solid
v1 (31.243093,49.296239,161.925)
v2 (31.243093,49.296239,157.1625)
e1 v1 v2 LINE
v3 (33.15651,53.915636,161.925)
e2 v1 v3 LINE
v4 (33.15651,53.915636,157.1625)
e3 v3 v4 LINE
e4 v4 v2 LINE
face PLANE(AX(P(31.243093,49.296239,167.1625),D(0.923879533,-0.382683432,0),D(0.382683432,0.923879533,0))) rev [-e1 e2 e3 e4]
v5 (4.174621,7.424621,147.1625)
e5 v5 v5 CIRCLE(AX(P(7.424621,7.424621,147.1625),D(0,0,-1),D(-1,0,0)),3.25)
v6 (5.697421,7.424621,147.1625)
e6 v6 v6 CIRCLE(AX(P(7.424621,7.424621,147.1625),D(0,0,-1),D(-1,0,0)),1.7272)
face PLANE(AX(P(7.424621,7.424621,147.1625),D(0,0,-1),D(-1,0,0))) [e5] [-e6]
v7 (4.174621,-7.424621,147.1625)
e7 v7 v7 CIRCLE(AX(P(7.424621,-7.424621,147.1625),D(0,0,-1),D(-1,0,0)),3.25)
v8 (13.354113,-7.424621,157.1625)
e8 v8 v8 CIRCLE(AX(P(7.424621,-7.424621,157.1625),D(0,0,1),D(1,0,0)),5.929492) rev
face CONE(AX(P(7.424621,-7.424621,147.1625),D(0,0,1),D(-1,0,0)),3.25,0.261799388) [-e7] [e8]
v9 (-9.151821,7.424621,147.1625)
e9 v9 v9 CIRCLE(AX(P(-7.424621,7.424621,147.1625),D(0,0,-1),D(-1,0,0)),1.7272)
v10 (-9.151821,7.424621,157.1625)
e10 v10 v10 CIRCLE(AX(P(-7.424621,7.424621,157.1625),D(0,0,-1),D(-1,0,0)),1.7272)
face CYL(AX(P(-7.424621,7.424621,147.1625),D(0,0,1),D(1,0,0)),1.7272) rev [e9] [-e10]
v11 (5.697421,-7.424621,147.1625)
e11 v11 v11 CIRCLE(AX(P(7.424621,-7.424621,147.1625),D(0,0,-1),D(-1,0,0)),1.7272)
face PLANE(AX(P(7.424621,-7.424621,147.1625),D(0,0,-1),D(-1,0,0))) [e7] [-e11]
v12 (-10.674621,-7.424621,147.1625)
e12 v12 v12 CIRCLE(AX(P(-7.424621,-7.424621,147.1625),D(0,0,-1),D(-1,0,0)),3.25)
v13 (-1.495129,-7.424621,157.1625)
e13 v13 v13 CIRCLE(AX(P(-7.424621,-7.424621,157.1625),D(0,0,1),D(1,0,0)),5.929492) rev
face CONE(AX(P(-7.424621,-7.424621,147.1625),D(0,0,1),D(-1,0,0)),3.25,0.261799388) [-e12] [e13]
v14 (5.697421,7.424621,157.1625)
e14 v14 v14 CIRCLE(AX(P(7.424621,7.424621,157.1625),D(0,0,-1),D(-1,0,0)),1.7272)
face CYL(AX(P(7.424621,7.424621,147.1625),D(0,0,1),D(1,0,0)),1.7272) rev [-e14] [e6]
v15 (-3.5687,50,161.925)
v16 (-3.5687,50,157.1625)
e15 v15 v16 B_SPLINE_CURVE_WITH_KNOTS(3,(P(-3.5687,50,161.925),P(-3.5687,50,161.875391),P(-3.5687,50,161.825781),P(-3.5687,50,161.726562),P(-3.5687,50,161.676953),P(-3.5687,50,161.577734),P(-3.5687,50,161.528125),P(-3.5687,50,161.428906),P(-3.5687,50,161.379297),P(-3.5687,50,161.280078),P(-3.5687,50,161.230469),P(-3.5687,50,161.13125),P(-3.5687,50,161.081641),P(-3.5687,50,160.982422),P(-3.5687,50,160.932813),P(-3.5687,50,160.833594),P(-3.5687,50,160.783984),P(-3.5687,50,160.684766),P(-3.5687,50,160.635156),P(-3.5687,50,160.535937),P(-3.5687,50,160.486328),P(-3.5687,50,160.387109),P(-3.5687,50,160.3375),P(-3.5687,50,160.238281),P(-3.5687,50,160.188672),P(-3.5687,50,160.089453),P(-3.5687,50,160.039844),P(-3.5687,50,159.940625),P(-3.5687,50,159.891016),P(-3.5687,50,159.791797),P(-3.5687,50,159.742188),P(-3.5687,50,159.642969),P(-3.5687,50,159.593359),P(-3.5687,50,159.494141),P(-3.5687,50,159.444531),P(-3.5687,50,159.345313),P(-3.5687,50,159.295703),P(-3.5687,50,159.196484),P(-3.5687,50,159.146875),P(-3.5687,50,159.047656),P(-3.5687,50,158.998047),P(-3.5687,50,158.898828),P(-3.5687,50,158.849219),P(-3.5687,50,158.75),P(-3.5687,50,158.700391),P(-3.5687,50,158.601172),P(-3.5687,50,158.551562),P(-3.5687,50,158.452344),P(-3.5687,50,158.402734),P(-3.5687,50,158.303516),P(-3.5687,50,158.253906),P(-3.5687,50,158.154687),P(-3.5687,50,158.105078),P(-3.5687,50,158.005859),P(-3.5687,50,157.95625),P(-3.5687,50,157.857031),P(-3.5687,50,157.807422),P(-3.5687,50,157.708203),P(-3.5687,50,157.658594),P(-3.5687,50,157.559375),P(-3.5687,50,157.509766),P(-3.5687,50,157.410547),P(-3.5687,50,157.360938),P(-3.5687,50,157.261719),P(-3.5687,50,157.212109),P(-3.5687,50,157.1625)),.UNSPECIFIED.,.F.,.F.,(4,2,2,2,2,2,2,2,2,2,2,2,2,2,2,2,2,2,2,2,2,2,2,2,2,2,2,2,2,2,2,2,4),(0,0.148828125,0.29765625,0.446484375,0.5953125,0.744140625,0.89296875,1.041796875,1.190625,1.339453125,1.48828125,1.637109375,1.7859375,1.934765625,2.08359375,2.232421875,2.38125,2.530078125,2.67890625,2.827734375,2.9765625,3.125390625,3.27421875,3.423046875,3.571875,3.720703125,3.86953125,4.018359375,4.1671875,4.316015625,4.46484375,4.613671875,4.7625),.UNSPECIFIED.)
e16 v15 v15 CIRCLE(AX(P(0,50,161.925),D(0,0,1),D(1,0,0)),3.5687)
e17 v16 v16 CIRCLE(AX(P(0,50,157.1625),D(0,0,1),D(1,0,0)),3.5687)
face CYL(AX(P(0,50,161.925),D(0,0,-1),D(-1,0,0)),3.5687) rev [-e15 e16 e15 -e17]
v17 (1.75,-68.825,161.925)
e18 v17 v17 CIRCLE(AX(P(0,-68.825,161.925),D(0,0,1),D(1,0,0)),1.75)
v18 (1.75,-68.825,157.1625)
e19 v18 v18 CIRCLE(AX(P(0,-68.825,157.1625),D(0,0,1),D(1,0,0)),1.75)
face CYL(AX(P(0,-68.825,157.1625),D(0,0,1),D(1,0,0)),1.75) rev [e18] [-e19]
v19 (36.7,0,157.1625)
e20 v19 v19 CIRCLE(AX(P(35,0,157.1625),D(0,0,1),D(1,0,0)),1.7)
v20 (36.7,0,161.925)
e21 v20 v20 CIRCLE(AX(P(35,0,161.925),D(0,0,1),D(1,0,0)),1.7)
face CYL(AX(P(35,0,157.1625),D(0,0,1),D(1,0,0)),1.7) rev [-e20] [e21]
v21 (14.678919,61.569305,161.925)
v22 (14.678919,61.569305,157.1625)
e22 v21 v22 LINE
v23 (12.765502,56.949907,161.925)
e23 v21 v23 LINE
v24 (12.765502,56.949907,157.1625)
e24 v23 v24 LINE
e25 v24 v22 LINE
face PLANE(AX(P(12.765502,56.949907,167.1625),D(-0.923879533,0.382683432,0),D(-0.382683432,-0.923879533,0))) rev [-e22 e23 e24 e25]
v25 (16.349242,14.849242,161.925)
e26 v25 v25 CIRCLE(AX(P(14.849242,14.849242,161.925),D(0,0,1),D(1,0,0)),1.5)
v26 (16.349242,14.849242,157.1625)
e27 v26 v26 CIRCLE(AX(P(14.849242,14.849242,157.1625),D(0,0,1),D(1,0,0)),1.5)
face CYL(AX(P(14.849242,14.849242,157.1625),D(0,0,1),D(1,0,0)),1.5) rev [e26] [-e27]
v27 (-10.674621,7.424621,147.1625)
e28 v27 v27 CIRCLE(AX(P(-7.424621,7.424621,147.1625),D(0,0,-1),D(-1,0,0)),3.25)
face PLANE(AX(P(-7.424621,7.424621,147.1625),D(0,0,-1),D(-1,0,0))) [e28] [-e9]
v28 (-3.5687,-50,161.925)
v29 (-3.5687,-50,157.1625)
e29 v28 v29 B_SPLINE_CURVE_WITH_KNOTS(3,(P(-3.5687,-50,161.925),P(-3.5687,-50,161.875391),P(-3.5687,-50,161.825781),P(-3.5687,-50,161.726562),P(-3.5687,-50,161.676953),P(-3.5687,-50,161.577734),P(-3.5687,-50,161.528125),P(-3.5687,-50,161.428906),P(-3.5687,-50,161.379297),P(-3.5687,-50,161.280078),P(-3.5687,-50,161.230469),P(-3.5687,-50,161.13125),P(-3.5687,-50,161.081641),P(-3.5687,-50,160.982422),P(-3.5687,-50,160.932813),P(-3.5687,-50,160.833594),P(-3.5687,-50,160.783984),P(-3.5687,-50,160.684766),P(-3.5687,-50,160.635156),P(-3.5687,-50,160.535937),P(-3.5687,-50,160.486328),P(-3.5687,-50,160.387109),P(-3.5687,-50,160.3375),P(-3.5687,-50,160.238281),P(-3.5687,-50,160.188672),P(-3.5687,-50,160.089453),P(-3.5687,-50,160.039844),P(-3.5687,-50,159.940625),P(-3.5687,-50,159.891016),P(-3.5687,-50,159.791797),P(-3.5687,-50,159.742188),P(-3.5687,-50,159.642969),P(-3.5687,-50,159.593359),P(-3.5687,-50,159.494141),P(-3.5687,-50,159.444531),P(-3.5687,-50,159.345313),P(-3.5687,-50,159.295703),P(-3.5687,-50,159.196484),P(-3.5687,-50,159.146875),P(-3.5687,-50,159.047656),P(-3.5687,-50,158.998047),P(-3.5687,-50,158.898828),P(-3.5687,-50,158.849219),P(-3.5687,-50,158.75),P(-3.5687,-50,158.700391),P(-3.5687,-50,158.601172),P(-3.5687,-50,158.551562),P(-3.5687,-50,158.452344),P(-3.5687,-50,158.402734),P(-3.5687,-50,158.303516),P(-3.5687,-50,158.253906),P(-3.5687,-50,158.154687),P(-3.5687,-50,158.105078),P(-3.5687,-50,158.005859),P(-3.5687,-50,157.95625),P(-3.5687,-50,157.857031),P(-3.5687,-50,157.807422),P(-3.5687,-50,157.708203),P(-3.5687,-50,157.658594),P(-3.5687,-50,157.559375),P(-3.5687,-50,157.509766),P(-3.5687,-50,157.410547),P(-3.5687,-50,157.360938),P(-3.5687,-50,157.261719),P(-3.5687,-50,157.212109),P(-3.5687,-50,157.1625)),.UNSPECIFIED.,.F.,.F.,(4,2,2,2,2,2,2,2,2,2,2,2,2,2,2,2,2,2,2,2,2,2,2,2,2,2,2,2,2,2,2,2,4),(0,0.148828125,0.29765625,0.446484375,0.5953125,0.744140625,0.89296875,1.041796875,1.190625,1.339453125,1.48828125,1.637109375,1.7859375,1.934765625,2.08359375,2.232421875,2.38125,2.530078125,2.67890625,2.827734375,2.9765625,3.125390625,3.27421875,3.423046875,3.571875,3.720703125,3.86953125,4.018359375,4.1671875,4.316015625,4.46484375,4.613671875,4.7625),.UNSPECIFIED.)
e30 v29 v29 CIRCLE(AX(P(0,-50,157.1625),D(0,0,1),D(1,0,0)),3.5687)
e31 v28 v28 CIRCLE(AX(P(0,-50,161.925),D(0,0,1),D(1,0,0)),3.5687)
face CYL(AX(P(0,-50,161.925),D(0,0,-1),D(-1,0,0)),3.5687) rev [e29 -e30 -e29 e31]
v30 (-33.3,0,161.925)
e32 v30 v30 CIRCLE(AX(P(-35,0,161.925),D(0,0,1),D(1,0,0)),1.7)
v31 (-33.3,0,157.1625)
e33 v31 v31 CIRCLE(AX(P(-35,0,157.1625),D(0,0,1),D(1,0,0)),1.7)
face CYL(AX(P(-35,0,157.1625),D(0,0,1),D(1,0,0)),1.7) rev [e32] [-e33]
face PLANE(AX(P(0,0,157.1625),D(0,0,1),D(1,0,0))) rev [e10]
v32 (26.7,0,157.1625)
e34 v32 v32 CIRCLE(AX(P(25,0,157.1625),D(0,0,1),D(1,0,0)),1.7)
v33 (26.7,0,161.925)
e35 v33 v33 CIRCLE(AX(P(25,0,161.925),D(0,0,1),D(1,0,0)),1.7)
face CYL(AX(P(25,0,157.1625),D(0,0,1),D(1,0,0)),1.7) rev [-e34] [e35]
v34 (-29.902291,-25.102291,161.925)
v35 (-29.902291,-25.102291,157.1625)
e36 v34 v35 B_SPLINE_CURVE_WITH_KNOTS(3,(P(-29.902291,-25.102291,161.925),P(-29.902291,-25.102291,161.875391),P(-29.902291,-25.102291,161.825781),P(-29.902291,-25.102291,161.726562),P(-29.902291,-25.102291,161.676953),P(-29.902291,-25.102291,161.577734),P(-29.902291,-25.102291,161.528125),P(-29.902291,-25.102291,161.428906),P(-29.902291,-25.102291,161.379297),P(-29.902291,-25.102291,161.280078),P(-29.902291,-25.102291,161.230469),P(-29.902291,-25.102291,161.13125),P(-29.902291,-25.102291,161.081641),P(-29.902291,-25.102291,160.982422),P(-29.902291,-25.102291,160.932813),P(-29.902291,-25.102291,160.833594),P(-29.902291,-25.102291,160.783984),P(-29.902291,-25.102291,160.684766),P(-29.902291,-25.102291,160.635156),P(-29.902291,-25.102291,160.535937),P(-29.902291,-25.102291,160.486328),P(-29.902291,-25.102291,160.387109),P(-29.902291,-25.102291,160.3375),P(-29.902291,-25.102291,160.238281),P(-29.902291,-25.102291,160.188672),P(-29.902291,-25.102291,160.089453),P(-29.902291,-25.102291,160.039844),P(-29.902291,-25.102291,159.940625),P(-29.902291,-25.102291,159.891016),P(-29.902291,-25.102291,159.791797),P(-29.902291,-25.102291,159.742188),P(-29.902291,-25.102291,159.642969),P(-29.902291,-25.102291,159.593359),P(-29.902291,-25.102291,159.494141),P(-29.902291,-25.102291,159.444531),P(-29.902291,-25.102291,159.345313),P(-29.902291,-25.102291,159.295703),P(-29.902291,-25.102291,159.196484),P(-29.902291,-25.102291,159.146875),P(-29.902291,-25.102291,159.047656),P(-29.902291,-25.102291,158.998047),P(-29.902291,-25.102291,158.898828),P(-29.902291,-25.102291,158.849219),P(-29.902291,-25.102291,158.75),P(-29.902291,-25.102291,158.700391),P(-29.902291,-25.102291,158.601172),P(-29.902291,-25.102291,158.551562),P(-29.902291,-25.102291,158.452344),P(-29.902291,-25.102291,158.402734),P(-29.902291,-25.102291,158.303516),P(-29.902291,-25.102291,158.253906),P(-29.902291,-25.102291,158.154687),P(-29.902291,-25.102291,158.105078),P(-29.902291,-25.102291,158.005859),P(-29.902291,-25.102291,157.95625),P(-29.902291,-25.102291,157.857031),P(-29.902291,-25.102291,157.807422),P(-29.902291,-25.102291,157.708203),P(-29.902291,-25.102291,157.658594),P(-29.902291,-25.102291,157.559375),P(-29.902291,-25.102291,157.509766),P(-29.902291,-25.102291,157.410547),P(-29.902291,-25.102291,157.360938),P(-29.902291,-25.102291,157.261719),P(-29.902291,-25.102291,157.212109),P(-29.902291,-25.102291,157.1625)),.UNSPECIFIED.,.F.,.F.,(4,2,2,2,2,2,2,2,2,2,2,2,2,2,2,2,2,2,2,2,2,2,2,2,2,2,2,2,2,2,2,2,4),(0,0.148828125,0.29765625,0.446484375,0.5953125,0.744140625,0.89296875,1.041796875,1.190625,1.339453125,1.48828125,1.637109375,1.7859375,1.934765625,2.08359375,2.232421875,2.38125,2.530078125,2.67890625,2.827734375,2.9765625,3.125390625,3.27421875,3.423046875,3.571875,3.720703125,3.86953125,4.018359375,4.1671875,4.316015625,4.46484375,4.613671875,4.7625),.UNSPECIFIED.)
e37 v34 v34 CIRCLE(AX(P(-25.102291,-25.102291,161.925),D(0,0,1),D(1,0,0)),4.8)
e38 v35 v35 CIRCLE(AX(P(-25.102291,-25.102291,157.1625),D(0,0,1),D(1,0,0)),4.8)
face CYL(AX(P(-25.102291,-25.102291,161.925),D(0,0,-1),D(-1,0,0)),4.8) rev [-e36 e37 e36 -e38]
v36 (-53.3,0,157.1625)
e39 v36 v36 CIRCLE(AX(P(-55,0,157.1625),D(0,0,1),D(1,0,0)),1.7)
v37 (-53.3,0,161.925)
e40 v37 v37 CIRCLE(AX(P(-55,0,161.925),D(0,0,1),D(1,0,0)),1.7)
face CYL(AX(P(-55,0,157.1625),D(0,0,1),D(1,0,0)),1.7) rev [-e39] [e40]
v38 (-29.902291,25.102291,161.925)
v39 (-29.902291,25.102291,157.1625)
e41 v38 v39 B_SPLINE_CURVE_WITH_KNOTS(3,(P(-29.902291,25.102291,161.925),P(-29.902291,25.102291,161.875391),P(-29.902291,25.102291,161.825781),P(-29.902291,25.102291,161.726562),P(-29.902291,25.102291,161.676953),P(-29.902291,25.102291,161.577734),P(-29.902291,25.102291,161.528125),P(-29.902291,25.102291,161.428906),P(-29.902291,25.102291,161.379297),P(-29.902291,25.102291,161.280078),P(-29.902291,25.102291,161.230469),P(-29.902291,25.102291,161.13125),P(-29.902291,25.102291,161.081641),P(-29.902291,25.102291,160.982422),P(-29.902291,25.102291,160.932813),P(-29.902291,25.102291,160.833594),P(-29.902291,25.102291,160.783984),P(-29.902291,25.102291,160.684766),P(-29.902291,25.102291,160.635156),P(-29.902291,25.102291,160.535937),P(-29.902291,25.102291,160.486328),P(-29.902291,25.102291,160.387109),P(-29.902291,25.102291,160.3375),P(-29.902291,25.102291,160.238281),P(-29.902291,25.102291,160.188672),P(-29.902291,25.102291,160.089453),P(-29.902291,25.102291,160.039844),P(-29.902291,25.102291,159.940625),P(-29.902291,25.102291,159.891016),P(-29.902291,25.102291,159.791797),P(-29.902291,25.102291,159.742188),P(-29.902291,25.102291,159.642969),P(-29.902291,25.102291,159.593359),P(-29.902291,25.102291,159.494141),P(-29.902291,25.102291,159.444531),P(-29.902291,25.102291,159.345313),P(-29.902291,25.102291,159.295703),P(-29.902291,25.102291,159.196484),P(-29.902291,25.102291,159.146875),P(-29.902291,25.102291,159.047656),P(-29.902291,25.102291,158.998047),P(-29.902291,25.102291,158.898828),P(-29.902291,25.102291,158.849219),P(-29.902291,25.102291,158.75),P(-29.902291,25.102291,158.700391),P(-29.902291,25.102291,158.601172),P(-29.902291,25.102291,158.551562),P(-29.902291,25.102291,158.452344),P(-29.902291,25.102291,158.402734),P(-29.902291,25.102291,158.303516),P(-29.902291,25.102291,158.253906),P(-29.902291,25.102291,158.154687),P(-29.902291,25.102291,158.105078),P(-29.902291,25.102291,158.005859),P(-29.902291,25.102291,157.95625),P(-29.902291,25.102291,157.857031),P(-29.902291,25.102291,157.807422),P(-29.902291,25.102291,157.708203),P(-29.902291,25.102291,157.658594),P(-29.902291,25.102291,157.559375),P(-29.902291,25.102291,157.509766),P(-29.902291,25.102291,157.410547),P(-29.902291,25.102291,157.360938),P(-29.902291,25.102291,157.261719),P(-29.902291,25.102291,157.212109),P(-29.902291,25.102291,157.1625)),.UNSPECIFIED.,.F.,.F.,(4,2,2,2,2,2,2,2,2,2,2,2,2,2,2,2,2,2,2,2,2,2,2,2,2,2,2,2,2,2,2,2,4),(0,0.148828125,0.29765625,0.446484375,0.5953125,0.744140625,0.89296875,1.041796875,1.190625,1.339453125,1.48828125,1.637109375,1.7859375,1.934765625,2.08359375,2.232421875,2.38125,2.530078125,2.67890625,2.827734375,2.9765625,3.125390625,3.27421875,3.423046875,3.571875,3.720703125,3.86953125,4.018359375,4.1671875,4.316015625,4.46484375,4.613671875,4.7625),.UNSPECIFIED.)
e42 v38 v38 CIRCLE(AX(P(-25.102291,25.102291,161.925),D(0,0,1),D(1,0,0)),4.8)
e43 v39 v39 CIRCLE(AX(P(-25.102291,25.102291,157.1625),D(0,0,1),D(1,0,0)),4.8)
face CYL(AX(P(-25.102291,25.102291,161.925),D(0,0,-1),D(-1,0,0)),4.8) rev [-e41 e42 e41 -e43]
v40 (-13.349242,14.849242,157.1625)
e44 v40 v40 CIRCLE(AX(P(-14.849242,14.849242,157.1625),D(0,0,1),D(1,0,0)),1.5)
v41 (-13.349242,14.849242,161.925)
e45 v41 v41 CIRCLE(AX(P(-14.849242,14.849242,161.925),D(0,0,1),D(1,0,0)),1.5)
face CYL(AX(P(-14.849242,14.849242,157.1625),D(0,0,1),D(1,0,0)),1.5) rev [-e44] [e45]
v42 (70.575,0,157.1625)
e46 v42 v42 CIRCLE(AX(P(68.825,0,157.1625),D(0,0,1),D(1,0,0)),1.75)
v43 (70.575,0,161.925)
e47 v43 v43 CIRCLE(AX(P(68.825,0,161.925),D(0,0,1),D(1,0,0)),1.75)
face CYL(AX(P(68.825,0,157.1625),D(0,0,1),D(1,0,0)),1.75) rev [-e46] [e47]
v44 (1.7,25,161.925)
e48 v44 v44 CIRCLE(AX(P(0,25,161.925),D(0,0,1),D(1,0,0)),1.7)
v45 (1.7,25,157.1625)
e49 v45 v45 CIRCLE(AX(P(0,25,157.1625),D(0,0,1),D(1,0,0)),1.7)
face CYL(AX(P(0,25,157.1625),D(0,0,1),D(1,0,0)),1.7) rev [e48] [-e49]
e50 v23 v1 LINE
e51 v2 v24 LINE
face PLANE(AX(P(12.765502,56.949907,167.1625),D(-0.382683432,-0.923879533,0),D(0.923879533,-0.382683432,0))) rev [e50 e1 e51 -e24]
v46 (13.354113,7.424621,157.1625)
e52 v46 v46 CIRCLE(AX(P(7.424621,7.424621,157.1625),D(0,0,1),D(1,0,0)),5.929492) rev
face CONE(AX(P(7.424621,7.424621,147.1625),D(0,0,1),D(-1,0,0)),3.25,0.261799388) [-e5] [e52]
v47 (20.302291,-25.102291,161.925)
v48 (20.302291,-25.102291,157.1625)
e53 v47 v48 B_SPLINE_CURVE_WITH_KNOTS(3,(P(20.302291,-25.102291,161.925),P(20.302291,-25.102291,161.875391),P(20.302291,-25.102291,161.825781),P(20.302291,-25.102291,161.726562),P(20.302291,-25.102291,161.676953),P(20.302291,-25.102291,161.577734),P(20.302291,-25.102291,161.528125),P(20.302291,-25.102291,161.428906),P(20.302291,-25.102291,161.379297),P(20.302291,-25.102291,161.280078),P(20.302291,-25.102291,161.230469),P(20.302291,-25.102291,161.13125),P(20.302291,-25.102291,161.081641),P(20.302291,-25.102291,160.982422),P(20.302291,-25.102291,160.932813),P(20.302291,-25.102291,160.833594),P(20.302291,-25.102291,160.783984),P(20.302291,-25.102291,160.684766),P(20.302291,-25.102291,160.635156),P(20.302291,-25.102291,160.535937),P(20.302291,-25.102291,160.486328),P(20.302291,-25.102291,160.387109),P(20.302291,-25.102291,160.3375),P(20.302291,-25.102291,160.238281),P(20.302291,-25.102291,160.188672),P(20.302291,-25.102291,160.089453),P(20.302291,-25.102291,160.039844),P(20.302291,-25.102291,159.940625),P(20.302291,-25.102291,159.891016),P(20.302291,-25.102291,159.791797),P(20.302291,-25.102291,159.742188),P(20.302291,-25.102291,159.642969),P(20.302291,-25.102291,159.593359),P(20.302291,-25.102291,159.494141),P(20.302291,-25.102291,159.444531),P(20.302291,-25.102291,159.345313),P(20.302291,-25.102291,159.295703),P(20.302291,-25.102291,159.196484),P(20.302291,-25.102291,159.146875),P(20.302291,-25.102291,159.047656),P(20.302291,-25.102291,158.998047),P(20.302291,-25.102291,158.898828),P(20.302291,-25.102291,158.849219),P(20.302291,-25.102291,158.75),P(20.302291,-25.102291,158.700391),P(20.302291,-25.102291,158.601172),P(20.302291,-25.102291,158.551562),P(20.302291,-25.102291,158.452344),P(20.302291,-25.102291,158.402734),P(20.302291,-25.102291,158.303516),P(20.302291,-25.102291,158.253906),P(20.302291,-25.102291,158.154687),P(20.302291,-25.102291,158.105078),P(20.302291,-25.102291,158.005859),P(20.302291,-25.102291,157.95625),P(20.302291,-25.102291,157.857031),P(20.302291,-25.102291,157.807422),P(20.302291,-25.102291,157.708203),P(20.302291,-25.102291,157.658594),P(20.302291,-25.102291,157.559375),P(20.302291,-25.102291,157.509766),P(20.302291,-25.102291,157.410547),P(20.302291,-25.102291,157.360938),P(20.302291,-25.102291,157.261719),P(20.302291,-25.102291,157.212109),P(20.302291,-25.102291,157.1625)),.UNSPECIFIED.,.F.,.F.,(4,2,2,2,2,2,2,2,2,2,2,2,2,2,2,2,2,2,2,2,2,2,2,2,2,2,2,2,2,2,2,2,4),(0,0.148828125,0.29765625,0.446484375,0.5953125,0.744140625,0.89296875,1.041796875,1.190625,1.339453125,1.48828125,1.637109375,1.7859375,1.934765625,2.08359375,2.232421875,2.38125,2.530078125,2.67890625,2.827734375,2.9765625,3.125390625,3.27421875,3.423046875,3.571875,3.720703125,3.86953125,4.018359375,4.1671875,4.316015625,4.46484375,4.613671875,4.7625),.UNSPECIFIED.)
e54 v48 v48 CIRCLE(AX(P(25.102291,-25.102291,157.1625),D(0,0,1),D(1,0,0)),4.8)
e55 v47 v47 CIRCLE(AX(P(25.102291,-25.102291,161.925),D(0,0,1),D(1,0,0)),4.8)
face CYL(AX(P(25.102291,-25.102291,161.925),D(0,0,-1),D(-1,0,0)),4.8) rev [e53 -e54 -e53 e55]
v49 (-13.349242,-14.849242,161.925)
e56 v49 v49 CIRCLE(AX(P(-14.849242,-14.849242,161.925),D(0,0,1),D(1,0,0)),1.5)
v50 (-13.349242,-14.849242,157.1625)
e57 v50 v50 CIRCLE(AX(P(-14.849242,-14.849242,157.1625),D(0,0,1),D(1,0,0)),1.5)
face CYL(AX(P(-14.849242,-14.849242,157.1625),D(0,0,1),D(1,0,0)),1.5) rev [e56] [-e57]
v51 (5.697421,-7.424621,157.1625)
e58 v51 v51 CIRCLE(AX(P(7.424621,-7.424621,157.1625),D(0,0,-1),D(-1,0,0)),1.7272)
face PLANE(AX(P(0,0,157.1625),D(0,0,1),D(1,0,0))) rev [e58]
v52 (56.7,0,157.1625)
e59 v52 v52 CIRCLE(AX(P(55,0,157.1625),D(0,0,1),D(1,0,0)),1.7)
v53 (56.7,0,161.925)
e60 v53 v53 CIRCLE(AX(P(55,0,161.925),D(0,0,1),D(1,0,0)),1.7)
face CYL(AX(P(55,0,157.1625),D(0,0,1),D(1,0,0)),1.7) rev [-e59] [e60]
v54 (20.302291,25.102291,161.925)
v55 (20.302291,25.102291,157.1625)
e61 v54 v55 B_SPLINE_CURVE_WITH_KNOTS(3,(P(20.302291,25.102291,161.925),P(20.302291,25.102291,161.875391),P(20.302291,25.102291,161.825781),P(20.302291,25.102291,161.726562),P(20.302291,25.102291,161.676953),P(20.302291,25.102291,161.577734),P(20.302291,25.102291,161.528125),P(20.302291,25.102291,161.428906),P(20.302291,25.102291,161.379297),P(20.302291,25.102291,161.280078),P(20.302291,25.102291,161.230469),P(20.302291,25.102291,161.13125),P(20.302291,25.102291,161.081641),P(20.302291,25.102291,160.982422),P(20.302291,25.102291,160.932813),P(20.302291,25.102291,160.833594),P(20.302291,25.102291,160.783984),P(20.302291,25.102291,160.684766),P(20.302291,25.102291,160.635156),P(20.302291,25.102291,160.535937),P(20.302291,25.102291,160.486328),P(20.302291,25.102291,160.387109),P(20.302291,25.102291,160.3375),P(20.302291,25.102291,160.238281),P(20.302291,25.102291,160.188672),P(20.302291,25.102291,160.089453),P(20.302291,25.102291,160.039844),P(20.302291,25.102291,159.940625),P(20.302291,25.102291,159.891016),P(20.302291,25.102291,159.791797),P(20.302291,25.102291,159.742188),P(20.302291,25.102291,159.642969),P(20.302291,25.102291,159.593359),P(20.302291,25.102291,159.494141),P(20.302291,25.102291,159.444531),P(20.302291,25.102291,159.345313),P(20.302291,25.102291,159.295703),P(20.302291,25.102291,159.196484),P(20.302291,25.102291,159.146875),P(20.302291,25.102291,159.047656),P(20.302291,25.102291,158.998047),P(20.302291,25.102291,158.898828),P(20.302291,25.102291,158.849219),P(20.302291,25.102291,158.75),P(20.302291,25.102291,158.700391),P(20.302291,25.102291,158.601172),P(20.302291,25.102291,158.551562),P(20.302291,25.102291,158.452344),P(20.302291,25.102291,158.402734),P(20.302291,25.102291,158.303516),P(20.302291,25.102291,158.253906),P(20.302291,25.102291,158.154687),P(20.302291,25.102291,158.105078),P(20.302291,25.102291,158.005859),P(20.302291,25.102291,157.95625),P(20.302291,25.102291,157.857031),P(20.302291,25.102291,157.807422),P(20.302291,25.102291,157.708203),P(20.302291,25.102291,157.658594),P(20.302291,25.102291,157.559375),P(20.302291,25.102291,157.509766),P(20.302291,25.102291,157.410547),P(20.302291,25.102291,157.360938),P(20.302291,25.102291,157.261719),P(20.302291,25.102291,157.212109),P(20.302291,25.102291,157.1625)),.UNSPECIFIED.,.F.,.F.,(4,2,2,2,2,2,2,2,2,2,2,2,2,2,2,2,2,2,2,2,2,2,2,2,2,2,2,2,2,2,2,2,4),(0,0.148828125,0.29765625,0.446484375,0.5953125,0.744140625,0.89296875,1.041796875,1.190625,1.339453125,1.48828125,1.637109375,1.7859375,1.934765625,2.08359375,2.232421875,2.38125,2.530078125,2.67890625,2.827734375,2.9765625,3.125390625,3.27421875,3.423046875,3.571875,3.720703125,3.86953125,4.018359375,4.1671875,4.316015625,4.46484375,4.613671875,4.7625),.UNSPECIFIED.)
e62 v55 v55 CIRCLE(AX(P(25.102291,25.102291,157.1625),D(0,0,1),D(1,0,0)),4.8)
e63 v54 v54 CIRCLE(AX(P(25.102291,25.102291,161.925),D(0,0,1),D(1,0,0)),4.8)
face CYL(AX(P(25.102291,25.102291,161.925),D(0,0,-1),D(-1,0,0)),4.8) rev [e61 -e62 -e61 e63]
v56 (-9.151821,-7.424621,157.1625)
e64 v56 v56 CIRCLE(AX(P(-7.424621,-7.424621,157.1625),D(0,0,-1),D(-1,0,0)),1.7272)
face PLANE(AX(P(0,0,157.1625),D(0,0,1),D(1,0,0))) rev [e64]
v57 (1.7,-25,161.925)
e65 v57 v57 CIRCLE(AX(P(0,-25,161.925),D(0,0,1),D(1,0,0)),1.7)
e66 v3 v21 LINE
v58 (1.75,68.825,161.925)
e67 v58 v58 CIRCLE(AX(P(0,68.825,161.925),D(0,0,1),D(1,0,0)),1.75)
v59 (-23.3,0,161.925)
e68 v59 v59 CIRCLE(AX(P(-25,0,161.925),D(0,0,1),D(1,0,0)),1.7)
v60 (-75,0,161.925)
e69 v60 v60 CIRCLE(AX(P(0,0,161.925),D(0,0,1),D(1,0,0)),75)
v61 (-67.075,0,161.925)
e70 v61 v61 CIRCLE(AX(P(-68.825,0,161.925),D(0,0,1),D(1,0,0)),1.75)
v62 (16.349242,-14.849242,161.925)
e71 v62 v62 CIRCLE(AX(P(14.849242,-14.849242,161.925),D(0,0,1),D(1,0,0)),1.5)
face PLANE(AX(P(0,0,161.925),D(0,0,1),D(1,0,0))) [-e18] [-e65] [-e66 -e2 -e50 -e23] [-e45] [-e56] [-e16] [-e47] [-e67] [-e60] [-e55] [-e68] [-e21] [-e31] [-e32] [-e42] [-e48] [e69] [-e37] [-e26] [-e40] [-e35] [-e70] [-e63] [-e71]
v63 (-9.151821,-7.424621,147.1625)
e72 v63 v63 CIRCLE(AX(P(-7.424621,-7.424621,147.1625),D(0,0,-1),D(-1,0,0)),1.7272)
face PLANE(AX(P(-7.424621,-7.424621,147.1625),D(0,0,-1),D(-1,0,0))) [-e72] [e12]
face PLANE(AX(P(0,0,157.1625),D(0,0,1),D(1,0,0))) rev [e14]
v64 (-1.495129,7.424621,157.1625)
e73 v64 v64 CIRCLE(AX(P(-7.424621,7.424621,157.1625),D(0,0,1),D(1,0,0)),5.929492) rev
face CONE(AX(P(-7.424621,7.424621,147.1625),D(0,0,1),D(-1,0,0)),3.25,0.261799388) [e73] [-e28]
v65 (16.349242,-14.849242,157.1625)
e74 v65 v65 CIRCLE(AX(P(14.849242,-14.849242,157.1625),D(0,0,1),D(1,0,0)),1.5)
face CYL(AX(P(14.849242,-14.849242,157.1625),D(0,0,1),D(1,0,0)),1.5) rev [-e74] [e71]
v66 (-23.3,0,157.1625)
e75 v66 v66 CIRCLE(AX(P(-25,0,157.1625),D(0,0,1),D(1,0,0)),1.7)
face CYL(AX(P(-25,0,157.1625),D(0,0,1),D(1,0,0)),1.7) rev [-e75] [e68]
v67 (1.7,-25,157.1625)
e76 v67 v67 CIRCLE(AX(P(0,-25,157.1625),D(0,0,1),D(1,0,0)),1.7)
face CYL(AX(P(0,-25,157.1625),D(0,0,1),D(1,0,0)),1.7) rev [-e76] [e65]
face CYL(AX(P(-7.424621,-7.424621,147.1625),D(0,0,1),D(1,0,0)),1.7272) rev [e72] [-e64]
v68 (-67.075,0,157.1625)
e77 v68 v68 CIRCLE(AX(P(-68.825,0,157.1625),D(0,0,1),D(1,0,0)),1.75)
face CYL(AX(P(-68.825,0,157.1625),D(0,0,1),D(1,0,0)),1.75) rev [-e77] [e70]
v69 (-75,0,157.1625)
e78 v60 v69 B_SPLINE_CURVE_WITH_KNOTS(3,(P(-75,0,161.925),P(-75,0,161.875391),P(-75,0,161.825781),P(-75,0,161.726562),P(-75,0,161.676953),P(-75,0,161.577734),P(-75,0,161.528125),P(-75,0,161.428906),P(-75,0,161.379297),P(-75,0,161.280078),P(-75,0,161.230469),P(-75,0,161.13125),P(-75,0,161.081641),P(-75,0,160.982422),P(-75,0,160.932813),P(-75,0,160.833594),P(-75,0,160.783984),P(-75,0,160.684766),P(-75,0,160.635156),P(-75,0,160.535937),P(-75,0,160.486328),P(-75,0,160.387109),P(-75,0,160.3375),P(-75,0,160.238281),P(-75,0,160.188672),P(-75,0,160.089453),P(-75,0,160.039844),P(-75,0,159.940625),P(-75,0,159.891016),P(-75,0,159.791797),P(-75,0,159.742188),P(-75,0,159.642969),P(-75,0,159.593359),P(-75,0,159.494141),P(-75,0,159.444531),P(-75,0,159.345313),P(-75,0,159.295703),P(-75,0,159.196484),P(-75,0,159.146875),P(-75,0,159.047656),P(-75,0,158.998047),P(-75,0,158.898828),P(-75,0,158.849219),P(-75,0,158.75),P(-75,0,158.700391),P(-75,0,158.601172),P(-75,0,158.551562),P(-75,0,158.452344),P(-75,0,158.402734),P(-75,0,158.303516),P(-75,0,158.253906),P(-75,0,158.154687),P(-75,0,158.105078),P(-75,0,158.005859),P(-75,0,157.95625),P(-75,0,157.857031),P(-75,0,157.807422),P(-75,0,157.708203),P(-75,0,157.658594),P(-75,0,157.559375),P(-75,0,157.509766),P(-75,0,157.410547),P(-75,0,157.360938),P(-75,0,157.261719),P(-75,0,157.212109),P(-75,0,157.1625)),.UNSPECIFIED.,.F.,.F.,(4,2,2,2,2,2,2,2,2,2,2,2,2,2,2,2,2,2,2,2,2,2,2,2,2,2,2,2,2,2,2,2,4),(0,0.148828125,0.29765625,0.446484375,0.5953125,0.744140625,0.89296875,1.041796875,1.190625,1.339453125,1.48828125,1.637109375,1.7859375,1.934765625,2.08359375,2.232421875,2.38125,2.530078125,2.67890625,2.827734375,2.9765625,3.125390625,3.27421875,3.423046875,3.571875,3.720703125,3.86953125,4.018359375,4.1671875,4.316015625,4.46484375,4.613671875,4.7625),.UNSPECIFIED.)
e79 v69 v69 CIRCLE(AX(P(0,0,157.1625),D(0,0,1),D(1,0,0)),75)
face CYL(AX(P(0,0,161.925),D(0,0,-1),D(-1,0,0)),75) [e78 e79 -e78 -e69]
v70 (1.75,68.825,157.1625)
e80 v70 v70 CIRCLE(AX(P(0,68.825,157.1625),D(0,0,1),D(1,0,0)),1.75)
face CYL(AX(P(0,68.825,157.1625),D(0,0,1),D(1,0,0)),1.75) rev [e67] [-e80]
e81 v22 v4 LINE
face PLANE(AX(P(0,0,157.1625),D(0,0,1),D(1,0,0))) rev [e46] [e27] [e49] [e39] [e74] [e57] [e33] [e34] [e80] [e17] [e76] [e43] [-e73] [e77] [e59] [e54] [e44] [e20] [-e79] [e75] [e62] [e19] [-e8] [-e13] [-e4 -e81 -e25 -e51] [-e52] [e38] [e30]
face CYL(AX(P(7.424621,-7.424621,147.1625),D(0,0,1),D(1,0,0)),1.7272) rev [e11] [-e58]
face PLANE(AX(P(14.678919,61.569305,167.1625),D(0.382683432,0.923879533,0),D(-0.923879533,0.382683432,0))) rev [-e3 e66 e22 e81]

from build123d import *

# Parameters (mm, degrees)
SKETCH2_R           = 75
SKETCH2_R_2         = 3.5687
SKETCH2_R_3         = 4.8
BOSS_EXTRUDE1_DEPTH = 4.7625
SKETCH3_R           = 1.5
CUT_EXTRUDE1_DEPTH  = 107.172884515
SKETCH4_R           = 1.7
CUT_EXTRUDE2_DEPTH  = 107.172884515
SKETCH5_R           = 1.7
CUT_EXTRUDE3_DEPTH  = 107.172884515
SKETCH6_R           = 1.75
CUT_EXTRUDE4_DEPTH  = 107.172884515
SKETCH7_R           = 3.25
SKETCH7_R_2         = 1.7272
BOSS_EXTRUDE2_DEPTH = 10
CUT_EXTRUDE5_DEPTH  = 10


# Read off the part's stored shape, not the designer's step: Draft1
with BuildPart() as part:
    # Sketch2 → Boss-Extrude1 (new body)
    with BuildSketch(Plane.XY.offset(157.1625)):
        with Locations(Location((0, 0, 0), (0, 0, 180))):
            Circle(SKETCH2_R)
        with Locations(Location((0, 50, 0), (0, 0, 180))):
            Circle(SKETCH2_R_2, mode=Mode.SUBTRACT)
        with Locations(Location((0, -50, 0), (0, 0, 180))):
            Circle(SKETCH2_R_2, mode=Mode.SUBTRACT)
        with Locations(Location((25.102290732, 25.102290732, 0), (0, 0, 180))):
            Circle(SKETCH2_R_3, mode=Mode.SUBTRACT)
        with Locations(Location((-25.102290732, 25.102290732, 0), (0, 0, 180))):
            Circle(SKETCH2_R_3, mode=Mode.SUBTRACT)
        with Locations(Location((-25.102290732, -25.102290732, 0), (0, 0, 180))):
            Circle(SKETCH2_R_3, mode=Mode.SUBTRACT)
        with Locations(Location((25.102290732, -25.102290732, 0), (0, 0, 180))):
            Circle(SKETCH2_R_3, mode=Mode.SUBTRACT)
    extrude(amount=BOSS_EXTRUDE1_DEPTH)

    # Sketch3 → Cut-Extrude1 (cut, through all)
    with BuildSketch(Plane.XY.offset(161.925)):
        with Locations((14.849242405, 14.849242405)):
            Circle(SKETCH3_R)
        with Locations((-14.849242405, 14.849242405)):
            Circle(SKETCH3_R)
        with Locations((-14.849242405, -14.849242405)):
            Circle(SKETCH3_R)
        with Locations((14.849242405, -14.849242405)):
            Circle(SKETCH3_R)
    extrude(amount=-CUT_EXTRUDE1_DEPTH, mode=Mode.SUBTRACT)

    # Sketch4 → Cut-Extrude2 (cut, through all)
    with BuildSketch(Plane.XY.offset(161.925)):
        with Locations((0, 25)):
            Circle(SKETCH4_R)
        with Locations((25, 0)):
            Circle(SKETCH4_R)
        with Locations((0, -25)):
            Circle(SKETCH4_R)
        with Locations((-25, 0)):
            Circle(SKETCH4_R)
    extrude(amount=-CUT_EXTRUDE2_DEPTH, mode=Mode.SUBTRACT)

    # Sketch5 → Cut-Extrude3 (cut, through all)
    with BuildSketch(Plane.XY.offset(161.925)):
        with Locations((-35, 0)):
            Circle(SKETCH5_R)
        with Locations((-55, 0)):
            Circle(SKETCH5_R)
        with Locations((35, 0)):
            Circle(SKETCH5_R)
        with Locations((55, 0)):
            Circle(SKETCH5_R)
    extrude(amount=-CUT_EXTRUDE3_DEPTH, mode=Mode.SUBTRACT)

    # Sketch6 → Cut-Extrude4 (cut, through all)
    with BuildSketch(Plane.XY.offset(161.925)):
        with Locations((0, 68.825)):
            Circle(SKETCH6_R)
        with Locations((68.825, 0)):
            Circle(SKETCH6_R)
        with Locations((0, -68.825)):
            Circle(SKETCH6_R)
        with Locations((-68.825, 0)):
            Circle(SKETCH6_R)
    extrude(amount=-CUT_EXTRUDE4_DEPTH, mode=Mode.SUBTRACT)

    # Sketch7 → Boss-Extrude2 (add)
    # profile 1 of 4: a face of its own
    with BuildSketch(Plane(origin=(0, 0, 157.1625), x_dir=(-1, 0, 0), z_dir=(0, 0, -1))):
        with Locations(Location((7.424621202, -7.424621202, 0), (0, 0, 180))):
            Circle(SKETCH7_R)
        with Locations((7.424621202, -7.424621202)):
            Circle(SKETCH7_R_2, mode=Mode.SUBTRACT)
    # profile 2 of 4: a face of its own
    with BuildSketch(Plane(origin=(0, 0, 157.1625), x_dir=(-1, 0, 0), z_dir=(0, 0, -1))):
        with Locations(Location((7.424621202, 7.424621202, 0), (0, 0, 180))):
            Circle(SKETCH7_R)
        with Locations((7.424621202, 7.424621202)):
            Circle(SKETCH7_R_2, mode=Mode.SUBTRACT)
    # profile 3 of 4: a face of its own
    with BuildSketch(Plane(origin=(0, 0, 157.1625), x_dir=(-1, 0, 0), z_dir=(0, 0, -1))):
        with Locations(Location((-7.424621202, 7.424621202, 0), (0, 0, 180))):
            Circle(SKETCH7_R)
        with Locations((-7.424621202, 7.424621202)):
            Circle(SKETCH7_R_2, mode=Mode.SUBTRACT)
    # profile 4 of 4: a face of its own
    with BuildSketch(Plane(origin=(0, 0, 157.1625), x_dir=(-1, 0, 0), z_dir=(0, 0, -1))):
        with Locations(Location((-7.424621202, -7.424621202, 0), (0, 0, 180))):
            Circle(SKETCH7_R)
        with Locations((-7.424621202, -7.424621202)):
            Circle(SKETCH7_R_2, mode=Mode.SUBTRACT)
    extrude(amount=BOSS_EXTRUDE2_DEPTH)

    # Sketch8 → Cut-Extrude5 (cut)
    with BuildSketch(Plane(origin=(0, 0, 157.1625), x_dir=(-1, 0, 0), z_dir=(0, 0, -1))):
        Polygon((-12.765502036, 56.949907443), (-31.243092686, 49.296238796), (-33.156509848, 53.915636458), (-14.678919198, 61.569305106), align=None)
    extrude(amount=-CUT_EXTRUDE5_DEPTH, mode=Mode.SUBTRACT)

    # Draft1 outline → Draft1 (revolve)
    with BuildSketch(Plane(origin=(-7.424621202, -7.424621202, 0), x_dir=(1, 0, 0), z_dir=(0, -1, 0))):
        Polygon((3.25, 157.1625), (3.25, 147.1625), (5.929491924, 157.1625), align=None)
    revolve(axis=Axis((-7.424621202, -7.424621202, 0), (0, 0, 1)))

    # Draft1 2 outline → Draft1 2 (revolve)
    with BuildSketch(Plane(origin=(-7.424621202, 7.424621202, 0), x_dir=(1, 0, 0), z_dir=(0, -1, 0))):
        Polygon((3.25, 157.1625), (3.25, 147.1625), (5.929491924, 157.1625), align=None)
    revolve(axis=Axis((-7.424621202, 7.424621202, 0), (0, 0, 1)))

    # Draft1 3 outline → Draft1 3 (revolve)
    with BuildSketch(Plane(origin=(7.424621202, 7.424621202, 0), x_dir=(1, 0, 0), z_dir=(0, -1, 0))):
        Polygon((3.25, 157.1625), (3.25, 147.1625), (5.929491924, 157.1625), align=None)
    revolve(axis=Axis((7.424621202, 7.424621202, 0), (0, 0, 1)))

    # Draft1 4 outline → Draft1 4 (revolve)
    with BuildSketch(Plane(origin=(7.424621202, -7.424621202, 0), x_dir=(1, 0, 0), z_dir=(0, -1, 0))):
        Polygon((3.25, 157.1625), (3.25, 147.1625), (5.929491924, 157.1625), align=None)
    revolve(axis=Axis((7.424621202, -7.424621202, 0), (0, 0, 1)))


solid = part.part
